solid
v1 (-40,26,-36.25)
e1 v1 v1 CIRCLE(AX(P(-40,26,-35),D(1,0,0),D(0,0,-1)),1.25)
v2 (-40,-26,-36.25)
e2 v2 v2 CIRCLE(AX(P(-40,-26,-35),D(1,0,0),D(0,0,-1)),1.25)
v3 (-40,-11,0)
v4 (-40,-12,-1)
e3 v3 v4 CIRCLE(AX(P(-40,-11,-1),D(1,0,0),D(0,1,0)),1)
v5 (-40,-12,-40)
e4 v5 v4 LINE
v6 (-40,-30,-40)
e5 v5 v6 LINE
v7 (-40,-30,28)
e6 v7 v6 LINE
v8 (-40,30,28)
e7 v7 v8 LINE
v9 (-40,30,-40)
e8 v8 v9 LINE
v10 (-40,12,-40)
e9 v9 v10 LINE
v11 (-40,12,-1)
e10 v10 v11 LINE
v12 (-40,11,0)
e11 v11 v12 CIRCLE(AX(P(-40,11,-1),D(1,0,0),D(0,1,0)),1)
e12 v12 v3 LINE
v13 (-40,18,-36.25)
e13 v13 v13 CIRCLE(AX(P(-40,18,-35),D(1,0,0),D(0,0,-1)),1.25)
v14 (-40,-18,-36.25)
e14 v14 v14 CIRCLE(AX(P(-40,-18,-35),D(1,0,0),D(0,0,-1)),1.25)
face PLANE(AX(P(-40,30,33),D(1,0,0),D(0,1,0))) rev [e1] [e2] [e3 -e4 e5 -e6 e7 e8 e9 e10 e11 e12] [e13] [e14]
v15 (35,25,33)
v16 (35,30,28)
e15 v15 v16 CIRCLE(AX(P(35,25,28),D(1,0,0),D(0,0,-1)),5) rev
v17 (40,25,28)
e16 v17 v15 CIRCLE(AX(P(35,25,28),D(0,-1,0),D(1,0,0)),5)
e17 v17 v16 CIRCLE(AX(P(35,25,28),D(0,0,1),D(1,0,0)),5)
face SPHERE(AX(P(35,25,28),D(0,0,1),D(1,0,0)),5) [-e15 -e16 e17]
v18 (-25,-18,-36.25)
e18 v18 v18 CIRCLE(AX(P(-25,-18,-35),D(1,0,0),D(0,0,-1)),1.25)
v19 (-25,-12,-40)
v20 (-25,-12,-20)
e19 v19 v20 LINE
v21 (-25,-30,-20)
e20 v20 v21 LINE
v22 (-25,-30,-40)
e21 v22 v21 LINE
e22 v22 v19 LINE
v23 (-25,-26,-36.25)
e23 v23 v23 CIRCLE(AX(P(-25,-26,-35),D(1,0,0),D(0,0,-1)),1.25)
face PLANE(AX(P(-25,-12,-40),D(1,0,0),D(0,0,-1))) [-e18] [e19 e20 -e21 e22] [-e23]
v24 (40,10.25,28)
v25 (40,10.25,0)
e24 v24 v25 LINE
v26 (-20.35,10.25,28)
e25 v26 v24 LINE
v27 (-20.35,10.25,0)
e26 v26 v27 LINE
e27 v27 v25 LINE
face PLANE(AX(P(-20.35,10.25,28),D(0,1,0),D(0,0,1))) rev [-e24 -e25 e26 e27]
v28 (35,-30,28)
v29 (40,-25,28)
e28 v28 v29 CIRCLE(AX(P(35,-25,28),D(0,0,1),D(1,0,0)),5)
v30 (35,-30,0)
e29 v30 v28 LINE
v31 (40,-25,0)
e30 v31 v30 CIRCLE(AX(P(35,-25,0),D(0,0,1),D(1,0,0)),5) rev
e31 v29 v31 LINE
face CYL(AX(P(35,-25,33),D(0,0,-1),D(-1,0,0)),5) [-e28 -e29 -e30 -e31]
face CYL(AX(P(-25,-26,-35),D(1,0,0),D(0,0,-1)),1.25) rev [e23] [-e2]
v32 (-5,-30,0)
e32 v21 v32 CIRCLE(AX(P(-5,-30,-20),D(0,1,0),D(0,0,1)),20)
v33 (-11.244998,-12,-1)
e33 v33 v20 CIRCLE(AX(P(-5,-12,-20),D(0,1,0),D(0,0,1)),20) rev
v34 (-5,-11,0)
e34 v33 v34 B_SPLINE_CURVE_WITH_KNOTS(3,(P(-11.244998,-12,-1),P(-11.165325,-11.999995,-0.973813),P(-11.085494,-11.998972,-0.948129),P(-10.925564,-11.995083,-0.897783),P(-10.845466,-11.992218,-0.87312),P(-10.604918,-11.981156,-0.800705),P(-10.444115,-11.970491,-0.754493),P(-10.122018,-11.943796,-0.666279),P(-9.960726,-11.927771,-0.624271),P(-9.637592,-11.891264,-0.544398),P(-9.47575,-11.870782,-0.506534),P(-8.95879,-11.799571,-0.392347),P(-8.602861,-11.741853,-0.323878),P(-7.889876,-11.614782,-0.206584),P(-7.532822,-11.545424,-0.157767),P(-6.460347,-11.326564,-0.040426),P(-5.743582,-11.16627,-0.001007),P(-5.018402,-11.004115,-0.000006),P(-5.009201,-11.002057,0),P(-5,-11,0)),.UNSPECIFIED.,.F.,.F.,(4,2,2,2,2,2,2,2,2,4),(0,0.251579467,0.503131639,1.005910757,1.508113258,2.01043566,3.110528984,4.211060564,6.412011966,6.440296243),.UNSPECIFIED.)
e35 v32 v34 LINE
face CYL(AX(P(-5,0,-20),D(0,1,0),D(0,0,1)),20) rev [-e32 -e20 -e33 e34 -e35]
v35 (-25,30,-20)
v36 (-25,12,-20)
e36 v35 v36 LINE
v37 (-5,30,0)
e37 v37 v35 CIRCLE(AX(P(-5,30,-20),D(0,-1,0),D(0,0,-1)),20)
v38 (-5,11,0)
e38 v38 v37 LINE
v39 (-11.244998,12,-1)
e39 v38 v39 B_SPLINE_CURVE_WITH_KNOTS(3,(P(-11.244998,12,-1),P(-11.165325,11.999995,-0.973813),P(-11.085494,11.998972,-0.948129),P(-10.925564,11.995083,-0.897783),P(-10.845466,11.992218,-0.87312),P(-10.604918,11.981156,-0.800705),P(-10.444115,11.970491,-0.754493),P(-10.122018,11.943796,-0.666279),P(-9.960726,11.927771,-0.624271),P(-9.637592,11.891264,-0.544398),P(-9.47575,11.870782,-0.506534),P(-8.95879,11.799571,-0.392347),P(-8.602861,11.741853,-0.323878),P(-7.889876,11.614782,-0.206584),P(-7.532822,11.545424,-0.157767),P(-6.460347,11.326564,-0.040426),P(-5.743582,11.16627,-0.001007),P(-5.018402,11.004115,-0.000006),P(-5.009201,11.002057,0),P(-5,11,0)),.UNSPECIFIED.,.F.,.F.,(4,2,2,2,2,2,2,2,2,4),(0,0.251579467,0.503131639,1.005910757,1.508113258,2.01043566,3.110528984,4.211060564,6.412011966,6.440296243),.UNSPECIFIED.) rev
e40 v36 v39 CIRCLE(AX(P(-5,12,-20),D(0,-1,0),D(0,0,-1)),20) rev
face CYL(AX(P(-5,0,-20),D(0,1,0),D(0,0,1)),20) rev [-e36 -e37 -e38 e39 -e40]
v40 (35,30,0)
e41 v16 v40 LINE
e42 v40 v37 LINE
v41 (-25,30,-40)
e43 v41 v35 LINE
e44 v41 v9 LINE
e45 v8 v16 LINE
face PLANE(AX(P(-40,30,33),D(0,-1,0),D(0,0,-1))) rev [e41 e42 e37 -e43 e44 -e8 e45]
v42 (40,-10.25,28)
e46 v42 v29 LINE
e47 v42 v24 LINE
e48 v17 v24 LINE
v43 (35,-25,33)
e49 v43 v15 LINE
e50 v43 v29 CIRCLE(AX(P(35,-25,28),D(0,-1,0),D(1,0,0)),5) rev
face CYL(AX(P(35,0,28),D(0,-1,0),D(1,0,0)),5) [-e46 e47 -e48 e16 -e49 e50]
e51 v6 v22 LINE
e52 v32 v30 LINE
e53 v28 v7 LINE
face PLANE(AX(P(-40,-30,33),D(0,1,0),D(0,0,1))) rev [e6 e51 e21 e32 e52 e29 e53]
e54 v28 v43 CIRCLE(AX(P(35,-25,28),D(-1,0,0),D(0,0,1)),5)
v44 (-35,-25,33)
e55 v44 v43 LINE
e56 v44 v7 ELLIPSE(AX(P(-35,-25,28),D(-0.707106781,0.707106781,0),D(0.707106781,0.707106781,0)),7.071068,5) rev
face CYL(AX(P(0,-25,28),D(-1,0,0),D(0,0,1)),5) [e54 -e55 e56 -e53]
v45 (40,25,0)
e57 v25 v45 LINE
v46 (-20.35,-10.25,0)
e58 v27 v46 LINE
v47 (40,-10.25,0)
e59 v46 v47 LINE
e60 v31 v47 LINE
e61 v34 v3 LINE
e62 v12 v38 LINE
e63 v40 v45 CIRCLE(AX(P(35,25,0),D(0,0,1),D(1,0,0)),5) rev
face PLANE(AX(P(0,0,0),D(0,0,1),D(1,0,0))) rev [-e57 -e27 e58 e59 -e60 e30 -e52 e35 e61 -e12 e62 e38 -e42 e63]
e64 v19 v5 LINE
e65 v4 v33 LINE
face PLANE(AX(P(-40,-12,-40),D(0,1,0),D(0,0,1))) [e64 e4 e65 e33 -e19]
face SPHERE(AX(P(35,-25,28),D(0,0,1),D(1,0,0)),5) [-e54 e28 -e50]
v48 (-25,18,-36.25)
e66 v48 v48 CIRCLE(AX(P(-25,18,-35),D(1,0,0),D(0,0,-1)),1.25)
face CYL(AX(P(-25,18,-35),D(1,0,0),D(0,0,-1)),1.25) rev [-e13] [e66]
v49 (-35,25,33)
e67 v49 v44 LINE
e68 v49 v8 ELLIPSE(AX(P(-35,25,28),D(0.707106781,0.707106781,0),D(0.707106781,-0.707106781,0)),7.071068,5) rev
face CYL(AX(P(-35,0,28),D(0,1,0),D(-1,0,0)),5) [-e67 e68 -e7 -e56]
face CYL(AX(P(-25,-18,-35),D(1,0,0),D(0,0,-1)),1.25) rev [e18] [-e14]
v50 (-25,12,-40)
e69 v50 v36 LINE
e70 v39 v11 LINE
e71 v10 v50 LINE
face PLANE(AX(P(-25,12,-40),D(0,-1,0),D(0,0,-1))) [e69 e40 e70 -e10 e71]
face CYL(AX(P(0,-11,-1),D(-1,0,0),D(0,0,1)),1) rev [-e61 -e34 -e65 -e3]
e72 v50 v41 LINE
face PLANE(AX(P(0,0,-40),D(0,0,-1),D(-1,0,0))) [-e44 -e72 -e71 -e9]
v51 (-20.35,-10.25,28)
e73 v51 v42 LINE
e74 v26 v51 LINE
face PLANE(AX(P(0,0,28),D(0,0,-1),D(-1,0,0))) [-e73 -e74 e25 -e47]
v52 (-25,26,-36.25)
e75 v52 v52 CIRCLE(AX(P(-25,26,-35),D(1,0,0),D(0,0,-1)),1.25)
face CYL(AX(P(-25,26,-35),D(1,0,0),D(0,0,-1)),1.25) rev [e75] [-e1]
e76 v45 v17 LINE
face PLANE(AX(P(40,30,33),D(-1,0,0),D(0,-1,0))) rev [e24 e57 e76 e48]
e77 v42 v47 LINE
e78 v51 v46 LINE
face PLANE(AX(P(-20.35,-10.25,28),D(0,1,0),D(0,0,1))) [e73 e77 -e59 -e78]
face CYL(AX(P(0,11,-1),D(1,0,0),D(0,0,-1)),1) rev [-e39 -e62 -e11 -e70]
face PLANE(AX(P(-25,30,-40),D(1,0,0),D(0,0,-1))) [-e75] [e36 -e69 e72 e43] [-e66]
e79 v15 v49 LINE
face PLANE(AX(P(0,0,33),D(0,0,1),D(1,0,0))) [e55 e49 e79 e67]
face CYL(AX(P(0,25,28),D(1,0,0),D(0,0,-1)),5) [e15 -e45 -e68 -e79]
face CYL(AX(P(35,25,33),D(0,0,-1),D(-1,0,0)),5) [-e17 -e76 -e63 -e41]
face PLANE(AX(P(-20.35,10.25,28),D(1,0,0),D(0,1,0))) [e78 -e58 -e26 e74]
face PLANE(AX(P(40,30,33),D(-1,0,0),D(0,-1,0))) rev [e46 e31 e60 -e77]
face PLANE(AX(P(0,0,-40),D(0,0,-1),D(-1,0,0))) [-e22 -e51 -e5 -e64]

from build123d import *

# Parameters (mm, degrees)
SKETCH_2_W          = 80
SKETCH_2_H          = 60
EXTRUDE_2_DEPTH     = 33
SKETCH_3_W          = 40.7
SKETCH_3_H          = 20.5
CUT_EXTRUDE_1_DEPTH = 28
SKETCH_4_W          = 19.65
SKETCH_4_H          = 20.5
EXTRUDE_3_DEPTH     = 28
SKETCH_5_W          = 19.65
SKETCH_5_H          = 20.5
CUT_EXTRUDE_4_DEPTH = 28
SKETCH_10_W         = 15
SKETCH_10_H         = 18
EXTRUDE_6_DEPTH     = 40
M3X0_5_1_D          = 2.5
FILLET_2_R          = 20
FILLET_START        = -41
FILLET_7_DEPTH      = 81
FILLET_START_2      = -31
FILLET_7_2_DEPTH    = 62
FILLET_8_R          = 5
FILLET_10_R         = 1


with BuildPart() as part:
    # ｽｹｯﾁ2 → ﾎﾞｽ - 押し出し2 (new body)
    with BuildSketch(Plane.XY):
        Rectangle(SKETCH_2_W, SKETCH_2_H)
    extrude(amount=EXTRUDE_2_DEPTH)

    # ｽｹｯﾁ3 → ｶｯﾄ - 押し出し1 (cut)
    with BuildSketch(Plane.XY):
        Rectangle(SKETCH_3_W, SKETCH_3_H)
    extrude(amount=CUT_EXTRUDE_1_DEPTH, mode=Mode.SUBTRACT)

    # ｽｹｯﾁ4 → ﾎﾞｽ - 押し出し3 (add)
    with BuildSketch(Plane.XY):
        with Locations((30.175, 0)):
            Rectangle(SKETCH_4_W, SKETCH_4_H)
    extrude(amount=EXTRUDE_3_DEPTH)

    # ｽｹｯﾁ5 → ｶｯﾄ - 押し出し4 (cut)
    with BuildSketch(Plane.XY):
        with Locations((30.175, 0)):
            Rectangle(SKETCH_5_W, SKETCH_5_H)
    extrude(amount=CUT_EXTRUDE_4_DEPTH, mode=Mode.SUBTRACT)

    # ｽｹｯﾁ10 → ﾎﾞｽ - 押し出し6 (add)
    with BuildSketch(Plane.XY):
        with Locations((-32.5, 21)):
            Rectangle(SKETCH_10_W, SKETCH_10_H)
        with Locations((-32.5, -21)):
            Rectangle(SKETCH_10_W, SKETCH_10_H)
    extrude(amount=-EXTRUDE_6_DEPTH)

    # M3x0.5 ねじ穴1 (through all)
    with Locations(Plane(origin=(-25, 0, 0), x_dir=(0, 0, -1), z_dir=(1, 0, 0))):
        with Locations((35, 18), (35, -18), (35, 26), (35, -26)):
            Hole(M3X0_5_1_D / 2)

    # ﾌｨﾚｯﾄ2
    fillet_2_edges = [part.edges().sort_by_distance(p)[0] for p in [
        (-25, 21, 0),
        (-25, -21, 0),
    ]]
    fillet(fillet_2_edges, radius=FILLET_2_R)

    # ﾌｨﾚｯﾄ7: read off the stored shape, not the designer's step
    # ﾌｨﾚｯﾄ7 outline → ﾌｨﾚｯﾄ7 (cut)
    with BuildSketch(Plane.YZ.offset(FILLET_START)):
        with BuildLine():
            ThreePointArc((-30, 28), (-28.535533906, 31.535533906), (-25, 33))
            Line((-25, 33), (-30, 33))
            Line((-30, 33), (-30, 28))
        make_face()
        with BuildLine():
            ThreePointArc((25, 33), (28.535533906, 31.535533906), (30, 28))
            Line((30, 28), (30, 33))
            Line((30, 33), (25, 33))
        make_face()
    extrude(amount=FILLET_7_DEPTH, mode=Mode.SUBTRACT)

    # Fillet 7 2 outline → Fillet 7 2 (cut)
    with BuildSketch(Plane(origin=(0, 0, 0), x_dir=(1, 0, 0), z_dir=(0, 1, 0)).offset(FILLET_START_2)):
        with BuildLine():
            ThreePointArc((40, -28), (38.535533906, -31.535533906), (35, -33))
            Line((35, -33), (40, -33))
            Line((40, -33), (40, -28))
        make_face()
        with BuildLine():
            ThreePointArc((-35, -33), (-38.535533906, -31.535533906), (-40, -28))
            Line((-40, -28), (-40, -33))
            Line((-40, -33), (-35, -33))
        make_face()
    extrude(amount=FILLET_7_2_DEPTH, mode=Mode.SUBTRACT)

    # ﾌｨﾚｯﾄ8
    # the kernel refuses this fillet: 5 mm, written as the material it takes off along each edge
    with BuildSketch(Plane(origin=(35, 25, 28), x_dir=(1, 0, 0), z_dir=(0, 1, 0))) as fillet_8_piece_1_section:
        Polygon((0, 0), (FILLET_8_R, 0), (FILLET_8_R, -FILLET_8_R), (0, -FILLET_8_R), align=None)
    fillet_8_piece_1 = extrude(amount=FILLET_8_R, mode=Mode.PRIVATE)
    fillet_8_piece_1 = fillet_8_piece_1 - Plane(origin=(35, 25, 28), x_dir=(-0.7071067811865475, 0, -0.7071067811865475), z_dir=(0, 1, 0)) * Sphere(FILLET_8_R, mode=Mode.PRIVATE)
    add(fillet_8_piece_1, mode=Mode.SUBTRACT)
    with BuildSketch(Plane(origin=(35, -25, 28), x_dir=(0, -1, 0), z_dir=(1, 0, 0))) as fillet_8_piece_2_section:
        Polygon((0, 0), (FILLET_8_R, 0), (FILLET_8_R, -FILLET_8_R), (0, -FILLET_8_R), align=None)
    fillet_8_piece_2 = extrude(amount=FILLET_8_R, mode=Mode.PRIVATE)
    fillet_8_piece_2 = fillet_8_piece_2 - Plane(origin=(35, -25, 28), x_dir=(0, 0.7071067811865475, -0.7071067811865475), z_dir=(1, 0, 0)) * Sphere(FILLET_8_R, mode=Mode.PRIVATE)
    add(fillet_8_piece_2, mode=Mode.SUBTRACT)
    with BuildSketch(Plane(origin=(40, -30, -12.5), x_dir=(0, 1, 0), z_dir=(0, 0, 1)), Plane(origin=(40, 30, -12.5), x_dir=(-1, 0, 0), z_dir=(0, 0, 1))) as fillet_8_piece_3:
        with BuildLine():
            CenterArc((FILLET_8_R, FILLET_8_R), FILLET_8_R, 180, 90)
            Line((0, FILLET_8_R), (0, 0))
            Line((0, 0), (FILLET_8_R, 0))
        make_face()
    extrude(amount=40.5, mode=Mode.SUBTRACT)

    # ﾌｨﾚｯﾄ10
    fillet_10_edges = [part.edges().sort_by_distance(p)[0] for p in [
        (-22.5, 12, 0),
        (-22.5, -12, 0),
    ]]
    fillet(fillet_10_edges, radius=FILLET_10_R)


solid = part.part
